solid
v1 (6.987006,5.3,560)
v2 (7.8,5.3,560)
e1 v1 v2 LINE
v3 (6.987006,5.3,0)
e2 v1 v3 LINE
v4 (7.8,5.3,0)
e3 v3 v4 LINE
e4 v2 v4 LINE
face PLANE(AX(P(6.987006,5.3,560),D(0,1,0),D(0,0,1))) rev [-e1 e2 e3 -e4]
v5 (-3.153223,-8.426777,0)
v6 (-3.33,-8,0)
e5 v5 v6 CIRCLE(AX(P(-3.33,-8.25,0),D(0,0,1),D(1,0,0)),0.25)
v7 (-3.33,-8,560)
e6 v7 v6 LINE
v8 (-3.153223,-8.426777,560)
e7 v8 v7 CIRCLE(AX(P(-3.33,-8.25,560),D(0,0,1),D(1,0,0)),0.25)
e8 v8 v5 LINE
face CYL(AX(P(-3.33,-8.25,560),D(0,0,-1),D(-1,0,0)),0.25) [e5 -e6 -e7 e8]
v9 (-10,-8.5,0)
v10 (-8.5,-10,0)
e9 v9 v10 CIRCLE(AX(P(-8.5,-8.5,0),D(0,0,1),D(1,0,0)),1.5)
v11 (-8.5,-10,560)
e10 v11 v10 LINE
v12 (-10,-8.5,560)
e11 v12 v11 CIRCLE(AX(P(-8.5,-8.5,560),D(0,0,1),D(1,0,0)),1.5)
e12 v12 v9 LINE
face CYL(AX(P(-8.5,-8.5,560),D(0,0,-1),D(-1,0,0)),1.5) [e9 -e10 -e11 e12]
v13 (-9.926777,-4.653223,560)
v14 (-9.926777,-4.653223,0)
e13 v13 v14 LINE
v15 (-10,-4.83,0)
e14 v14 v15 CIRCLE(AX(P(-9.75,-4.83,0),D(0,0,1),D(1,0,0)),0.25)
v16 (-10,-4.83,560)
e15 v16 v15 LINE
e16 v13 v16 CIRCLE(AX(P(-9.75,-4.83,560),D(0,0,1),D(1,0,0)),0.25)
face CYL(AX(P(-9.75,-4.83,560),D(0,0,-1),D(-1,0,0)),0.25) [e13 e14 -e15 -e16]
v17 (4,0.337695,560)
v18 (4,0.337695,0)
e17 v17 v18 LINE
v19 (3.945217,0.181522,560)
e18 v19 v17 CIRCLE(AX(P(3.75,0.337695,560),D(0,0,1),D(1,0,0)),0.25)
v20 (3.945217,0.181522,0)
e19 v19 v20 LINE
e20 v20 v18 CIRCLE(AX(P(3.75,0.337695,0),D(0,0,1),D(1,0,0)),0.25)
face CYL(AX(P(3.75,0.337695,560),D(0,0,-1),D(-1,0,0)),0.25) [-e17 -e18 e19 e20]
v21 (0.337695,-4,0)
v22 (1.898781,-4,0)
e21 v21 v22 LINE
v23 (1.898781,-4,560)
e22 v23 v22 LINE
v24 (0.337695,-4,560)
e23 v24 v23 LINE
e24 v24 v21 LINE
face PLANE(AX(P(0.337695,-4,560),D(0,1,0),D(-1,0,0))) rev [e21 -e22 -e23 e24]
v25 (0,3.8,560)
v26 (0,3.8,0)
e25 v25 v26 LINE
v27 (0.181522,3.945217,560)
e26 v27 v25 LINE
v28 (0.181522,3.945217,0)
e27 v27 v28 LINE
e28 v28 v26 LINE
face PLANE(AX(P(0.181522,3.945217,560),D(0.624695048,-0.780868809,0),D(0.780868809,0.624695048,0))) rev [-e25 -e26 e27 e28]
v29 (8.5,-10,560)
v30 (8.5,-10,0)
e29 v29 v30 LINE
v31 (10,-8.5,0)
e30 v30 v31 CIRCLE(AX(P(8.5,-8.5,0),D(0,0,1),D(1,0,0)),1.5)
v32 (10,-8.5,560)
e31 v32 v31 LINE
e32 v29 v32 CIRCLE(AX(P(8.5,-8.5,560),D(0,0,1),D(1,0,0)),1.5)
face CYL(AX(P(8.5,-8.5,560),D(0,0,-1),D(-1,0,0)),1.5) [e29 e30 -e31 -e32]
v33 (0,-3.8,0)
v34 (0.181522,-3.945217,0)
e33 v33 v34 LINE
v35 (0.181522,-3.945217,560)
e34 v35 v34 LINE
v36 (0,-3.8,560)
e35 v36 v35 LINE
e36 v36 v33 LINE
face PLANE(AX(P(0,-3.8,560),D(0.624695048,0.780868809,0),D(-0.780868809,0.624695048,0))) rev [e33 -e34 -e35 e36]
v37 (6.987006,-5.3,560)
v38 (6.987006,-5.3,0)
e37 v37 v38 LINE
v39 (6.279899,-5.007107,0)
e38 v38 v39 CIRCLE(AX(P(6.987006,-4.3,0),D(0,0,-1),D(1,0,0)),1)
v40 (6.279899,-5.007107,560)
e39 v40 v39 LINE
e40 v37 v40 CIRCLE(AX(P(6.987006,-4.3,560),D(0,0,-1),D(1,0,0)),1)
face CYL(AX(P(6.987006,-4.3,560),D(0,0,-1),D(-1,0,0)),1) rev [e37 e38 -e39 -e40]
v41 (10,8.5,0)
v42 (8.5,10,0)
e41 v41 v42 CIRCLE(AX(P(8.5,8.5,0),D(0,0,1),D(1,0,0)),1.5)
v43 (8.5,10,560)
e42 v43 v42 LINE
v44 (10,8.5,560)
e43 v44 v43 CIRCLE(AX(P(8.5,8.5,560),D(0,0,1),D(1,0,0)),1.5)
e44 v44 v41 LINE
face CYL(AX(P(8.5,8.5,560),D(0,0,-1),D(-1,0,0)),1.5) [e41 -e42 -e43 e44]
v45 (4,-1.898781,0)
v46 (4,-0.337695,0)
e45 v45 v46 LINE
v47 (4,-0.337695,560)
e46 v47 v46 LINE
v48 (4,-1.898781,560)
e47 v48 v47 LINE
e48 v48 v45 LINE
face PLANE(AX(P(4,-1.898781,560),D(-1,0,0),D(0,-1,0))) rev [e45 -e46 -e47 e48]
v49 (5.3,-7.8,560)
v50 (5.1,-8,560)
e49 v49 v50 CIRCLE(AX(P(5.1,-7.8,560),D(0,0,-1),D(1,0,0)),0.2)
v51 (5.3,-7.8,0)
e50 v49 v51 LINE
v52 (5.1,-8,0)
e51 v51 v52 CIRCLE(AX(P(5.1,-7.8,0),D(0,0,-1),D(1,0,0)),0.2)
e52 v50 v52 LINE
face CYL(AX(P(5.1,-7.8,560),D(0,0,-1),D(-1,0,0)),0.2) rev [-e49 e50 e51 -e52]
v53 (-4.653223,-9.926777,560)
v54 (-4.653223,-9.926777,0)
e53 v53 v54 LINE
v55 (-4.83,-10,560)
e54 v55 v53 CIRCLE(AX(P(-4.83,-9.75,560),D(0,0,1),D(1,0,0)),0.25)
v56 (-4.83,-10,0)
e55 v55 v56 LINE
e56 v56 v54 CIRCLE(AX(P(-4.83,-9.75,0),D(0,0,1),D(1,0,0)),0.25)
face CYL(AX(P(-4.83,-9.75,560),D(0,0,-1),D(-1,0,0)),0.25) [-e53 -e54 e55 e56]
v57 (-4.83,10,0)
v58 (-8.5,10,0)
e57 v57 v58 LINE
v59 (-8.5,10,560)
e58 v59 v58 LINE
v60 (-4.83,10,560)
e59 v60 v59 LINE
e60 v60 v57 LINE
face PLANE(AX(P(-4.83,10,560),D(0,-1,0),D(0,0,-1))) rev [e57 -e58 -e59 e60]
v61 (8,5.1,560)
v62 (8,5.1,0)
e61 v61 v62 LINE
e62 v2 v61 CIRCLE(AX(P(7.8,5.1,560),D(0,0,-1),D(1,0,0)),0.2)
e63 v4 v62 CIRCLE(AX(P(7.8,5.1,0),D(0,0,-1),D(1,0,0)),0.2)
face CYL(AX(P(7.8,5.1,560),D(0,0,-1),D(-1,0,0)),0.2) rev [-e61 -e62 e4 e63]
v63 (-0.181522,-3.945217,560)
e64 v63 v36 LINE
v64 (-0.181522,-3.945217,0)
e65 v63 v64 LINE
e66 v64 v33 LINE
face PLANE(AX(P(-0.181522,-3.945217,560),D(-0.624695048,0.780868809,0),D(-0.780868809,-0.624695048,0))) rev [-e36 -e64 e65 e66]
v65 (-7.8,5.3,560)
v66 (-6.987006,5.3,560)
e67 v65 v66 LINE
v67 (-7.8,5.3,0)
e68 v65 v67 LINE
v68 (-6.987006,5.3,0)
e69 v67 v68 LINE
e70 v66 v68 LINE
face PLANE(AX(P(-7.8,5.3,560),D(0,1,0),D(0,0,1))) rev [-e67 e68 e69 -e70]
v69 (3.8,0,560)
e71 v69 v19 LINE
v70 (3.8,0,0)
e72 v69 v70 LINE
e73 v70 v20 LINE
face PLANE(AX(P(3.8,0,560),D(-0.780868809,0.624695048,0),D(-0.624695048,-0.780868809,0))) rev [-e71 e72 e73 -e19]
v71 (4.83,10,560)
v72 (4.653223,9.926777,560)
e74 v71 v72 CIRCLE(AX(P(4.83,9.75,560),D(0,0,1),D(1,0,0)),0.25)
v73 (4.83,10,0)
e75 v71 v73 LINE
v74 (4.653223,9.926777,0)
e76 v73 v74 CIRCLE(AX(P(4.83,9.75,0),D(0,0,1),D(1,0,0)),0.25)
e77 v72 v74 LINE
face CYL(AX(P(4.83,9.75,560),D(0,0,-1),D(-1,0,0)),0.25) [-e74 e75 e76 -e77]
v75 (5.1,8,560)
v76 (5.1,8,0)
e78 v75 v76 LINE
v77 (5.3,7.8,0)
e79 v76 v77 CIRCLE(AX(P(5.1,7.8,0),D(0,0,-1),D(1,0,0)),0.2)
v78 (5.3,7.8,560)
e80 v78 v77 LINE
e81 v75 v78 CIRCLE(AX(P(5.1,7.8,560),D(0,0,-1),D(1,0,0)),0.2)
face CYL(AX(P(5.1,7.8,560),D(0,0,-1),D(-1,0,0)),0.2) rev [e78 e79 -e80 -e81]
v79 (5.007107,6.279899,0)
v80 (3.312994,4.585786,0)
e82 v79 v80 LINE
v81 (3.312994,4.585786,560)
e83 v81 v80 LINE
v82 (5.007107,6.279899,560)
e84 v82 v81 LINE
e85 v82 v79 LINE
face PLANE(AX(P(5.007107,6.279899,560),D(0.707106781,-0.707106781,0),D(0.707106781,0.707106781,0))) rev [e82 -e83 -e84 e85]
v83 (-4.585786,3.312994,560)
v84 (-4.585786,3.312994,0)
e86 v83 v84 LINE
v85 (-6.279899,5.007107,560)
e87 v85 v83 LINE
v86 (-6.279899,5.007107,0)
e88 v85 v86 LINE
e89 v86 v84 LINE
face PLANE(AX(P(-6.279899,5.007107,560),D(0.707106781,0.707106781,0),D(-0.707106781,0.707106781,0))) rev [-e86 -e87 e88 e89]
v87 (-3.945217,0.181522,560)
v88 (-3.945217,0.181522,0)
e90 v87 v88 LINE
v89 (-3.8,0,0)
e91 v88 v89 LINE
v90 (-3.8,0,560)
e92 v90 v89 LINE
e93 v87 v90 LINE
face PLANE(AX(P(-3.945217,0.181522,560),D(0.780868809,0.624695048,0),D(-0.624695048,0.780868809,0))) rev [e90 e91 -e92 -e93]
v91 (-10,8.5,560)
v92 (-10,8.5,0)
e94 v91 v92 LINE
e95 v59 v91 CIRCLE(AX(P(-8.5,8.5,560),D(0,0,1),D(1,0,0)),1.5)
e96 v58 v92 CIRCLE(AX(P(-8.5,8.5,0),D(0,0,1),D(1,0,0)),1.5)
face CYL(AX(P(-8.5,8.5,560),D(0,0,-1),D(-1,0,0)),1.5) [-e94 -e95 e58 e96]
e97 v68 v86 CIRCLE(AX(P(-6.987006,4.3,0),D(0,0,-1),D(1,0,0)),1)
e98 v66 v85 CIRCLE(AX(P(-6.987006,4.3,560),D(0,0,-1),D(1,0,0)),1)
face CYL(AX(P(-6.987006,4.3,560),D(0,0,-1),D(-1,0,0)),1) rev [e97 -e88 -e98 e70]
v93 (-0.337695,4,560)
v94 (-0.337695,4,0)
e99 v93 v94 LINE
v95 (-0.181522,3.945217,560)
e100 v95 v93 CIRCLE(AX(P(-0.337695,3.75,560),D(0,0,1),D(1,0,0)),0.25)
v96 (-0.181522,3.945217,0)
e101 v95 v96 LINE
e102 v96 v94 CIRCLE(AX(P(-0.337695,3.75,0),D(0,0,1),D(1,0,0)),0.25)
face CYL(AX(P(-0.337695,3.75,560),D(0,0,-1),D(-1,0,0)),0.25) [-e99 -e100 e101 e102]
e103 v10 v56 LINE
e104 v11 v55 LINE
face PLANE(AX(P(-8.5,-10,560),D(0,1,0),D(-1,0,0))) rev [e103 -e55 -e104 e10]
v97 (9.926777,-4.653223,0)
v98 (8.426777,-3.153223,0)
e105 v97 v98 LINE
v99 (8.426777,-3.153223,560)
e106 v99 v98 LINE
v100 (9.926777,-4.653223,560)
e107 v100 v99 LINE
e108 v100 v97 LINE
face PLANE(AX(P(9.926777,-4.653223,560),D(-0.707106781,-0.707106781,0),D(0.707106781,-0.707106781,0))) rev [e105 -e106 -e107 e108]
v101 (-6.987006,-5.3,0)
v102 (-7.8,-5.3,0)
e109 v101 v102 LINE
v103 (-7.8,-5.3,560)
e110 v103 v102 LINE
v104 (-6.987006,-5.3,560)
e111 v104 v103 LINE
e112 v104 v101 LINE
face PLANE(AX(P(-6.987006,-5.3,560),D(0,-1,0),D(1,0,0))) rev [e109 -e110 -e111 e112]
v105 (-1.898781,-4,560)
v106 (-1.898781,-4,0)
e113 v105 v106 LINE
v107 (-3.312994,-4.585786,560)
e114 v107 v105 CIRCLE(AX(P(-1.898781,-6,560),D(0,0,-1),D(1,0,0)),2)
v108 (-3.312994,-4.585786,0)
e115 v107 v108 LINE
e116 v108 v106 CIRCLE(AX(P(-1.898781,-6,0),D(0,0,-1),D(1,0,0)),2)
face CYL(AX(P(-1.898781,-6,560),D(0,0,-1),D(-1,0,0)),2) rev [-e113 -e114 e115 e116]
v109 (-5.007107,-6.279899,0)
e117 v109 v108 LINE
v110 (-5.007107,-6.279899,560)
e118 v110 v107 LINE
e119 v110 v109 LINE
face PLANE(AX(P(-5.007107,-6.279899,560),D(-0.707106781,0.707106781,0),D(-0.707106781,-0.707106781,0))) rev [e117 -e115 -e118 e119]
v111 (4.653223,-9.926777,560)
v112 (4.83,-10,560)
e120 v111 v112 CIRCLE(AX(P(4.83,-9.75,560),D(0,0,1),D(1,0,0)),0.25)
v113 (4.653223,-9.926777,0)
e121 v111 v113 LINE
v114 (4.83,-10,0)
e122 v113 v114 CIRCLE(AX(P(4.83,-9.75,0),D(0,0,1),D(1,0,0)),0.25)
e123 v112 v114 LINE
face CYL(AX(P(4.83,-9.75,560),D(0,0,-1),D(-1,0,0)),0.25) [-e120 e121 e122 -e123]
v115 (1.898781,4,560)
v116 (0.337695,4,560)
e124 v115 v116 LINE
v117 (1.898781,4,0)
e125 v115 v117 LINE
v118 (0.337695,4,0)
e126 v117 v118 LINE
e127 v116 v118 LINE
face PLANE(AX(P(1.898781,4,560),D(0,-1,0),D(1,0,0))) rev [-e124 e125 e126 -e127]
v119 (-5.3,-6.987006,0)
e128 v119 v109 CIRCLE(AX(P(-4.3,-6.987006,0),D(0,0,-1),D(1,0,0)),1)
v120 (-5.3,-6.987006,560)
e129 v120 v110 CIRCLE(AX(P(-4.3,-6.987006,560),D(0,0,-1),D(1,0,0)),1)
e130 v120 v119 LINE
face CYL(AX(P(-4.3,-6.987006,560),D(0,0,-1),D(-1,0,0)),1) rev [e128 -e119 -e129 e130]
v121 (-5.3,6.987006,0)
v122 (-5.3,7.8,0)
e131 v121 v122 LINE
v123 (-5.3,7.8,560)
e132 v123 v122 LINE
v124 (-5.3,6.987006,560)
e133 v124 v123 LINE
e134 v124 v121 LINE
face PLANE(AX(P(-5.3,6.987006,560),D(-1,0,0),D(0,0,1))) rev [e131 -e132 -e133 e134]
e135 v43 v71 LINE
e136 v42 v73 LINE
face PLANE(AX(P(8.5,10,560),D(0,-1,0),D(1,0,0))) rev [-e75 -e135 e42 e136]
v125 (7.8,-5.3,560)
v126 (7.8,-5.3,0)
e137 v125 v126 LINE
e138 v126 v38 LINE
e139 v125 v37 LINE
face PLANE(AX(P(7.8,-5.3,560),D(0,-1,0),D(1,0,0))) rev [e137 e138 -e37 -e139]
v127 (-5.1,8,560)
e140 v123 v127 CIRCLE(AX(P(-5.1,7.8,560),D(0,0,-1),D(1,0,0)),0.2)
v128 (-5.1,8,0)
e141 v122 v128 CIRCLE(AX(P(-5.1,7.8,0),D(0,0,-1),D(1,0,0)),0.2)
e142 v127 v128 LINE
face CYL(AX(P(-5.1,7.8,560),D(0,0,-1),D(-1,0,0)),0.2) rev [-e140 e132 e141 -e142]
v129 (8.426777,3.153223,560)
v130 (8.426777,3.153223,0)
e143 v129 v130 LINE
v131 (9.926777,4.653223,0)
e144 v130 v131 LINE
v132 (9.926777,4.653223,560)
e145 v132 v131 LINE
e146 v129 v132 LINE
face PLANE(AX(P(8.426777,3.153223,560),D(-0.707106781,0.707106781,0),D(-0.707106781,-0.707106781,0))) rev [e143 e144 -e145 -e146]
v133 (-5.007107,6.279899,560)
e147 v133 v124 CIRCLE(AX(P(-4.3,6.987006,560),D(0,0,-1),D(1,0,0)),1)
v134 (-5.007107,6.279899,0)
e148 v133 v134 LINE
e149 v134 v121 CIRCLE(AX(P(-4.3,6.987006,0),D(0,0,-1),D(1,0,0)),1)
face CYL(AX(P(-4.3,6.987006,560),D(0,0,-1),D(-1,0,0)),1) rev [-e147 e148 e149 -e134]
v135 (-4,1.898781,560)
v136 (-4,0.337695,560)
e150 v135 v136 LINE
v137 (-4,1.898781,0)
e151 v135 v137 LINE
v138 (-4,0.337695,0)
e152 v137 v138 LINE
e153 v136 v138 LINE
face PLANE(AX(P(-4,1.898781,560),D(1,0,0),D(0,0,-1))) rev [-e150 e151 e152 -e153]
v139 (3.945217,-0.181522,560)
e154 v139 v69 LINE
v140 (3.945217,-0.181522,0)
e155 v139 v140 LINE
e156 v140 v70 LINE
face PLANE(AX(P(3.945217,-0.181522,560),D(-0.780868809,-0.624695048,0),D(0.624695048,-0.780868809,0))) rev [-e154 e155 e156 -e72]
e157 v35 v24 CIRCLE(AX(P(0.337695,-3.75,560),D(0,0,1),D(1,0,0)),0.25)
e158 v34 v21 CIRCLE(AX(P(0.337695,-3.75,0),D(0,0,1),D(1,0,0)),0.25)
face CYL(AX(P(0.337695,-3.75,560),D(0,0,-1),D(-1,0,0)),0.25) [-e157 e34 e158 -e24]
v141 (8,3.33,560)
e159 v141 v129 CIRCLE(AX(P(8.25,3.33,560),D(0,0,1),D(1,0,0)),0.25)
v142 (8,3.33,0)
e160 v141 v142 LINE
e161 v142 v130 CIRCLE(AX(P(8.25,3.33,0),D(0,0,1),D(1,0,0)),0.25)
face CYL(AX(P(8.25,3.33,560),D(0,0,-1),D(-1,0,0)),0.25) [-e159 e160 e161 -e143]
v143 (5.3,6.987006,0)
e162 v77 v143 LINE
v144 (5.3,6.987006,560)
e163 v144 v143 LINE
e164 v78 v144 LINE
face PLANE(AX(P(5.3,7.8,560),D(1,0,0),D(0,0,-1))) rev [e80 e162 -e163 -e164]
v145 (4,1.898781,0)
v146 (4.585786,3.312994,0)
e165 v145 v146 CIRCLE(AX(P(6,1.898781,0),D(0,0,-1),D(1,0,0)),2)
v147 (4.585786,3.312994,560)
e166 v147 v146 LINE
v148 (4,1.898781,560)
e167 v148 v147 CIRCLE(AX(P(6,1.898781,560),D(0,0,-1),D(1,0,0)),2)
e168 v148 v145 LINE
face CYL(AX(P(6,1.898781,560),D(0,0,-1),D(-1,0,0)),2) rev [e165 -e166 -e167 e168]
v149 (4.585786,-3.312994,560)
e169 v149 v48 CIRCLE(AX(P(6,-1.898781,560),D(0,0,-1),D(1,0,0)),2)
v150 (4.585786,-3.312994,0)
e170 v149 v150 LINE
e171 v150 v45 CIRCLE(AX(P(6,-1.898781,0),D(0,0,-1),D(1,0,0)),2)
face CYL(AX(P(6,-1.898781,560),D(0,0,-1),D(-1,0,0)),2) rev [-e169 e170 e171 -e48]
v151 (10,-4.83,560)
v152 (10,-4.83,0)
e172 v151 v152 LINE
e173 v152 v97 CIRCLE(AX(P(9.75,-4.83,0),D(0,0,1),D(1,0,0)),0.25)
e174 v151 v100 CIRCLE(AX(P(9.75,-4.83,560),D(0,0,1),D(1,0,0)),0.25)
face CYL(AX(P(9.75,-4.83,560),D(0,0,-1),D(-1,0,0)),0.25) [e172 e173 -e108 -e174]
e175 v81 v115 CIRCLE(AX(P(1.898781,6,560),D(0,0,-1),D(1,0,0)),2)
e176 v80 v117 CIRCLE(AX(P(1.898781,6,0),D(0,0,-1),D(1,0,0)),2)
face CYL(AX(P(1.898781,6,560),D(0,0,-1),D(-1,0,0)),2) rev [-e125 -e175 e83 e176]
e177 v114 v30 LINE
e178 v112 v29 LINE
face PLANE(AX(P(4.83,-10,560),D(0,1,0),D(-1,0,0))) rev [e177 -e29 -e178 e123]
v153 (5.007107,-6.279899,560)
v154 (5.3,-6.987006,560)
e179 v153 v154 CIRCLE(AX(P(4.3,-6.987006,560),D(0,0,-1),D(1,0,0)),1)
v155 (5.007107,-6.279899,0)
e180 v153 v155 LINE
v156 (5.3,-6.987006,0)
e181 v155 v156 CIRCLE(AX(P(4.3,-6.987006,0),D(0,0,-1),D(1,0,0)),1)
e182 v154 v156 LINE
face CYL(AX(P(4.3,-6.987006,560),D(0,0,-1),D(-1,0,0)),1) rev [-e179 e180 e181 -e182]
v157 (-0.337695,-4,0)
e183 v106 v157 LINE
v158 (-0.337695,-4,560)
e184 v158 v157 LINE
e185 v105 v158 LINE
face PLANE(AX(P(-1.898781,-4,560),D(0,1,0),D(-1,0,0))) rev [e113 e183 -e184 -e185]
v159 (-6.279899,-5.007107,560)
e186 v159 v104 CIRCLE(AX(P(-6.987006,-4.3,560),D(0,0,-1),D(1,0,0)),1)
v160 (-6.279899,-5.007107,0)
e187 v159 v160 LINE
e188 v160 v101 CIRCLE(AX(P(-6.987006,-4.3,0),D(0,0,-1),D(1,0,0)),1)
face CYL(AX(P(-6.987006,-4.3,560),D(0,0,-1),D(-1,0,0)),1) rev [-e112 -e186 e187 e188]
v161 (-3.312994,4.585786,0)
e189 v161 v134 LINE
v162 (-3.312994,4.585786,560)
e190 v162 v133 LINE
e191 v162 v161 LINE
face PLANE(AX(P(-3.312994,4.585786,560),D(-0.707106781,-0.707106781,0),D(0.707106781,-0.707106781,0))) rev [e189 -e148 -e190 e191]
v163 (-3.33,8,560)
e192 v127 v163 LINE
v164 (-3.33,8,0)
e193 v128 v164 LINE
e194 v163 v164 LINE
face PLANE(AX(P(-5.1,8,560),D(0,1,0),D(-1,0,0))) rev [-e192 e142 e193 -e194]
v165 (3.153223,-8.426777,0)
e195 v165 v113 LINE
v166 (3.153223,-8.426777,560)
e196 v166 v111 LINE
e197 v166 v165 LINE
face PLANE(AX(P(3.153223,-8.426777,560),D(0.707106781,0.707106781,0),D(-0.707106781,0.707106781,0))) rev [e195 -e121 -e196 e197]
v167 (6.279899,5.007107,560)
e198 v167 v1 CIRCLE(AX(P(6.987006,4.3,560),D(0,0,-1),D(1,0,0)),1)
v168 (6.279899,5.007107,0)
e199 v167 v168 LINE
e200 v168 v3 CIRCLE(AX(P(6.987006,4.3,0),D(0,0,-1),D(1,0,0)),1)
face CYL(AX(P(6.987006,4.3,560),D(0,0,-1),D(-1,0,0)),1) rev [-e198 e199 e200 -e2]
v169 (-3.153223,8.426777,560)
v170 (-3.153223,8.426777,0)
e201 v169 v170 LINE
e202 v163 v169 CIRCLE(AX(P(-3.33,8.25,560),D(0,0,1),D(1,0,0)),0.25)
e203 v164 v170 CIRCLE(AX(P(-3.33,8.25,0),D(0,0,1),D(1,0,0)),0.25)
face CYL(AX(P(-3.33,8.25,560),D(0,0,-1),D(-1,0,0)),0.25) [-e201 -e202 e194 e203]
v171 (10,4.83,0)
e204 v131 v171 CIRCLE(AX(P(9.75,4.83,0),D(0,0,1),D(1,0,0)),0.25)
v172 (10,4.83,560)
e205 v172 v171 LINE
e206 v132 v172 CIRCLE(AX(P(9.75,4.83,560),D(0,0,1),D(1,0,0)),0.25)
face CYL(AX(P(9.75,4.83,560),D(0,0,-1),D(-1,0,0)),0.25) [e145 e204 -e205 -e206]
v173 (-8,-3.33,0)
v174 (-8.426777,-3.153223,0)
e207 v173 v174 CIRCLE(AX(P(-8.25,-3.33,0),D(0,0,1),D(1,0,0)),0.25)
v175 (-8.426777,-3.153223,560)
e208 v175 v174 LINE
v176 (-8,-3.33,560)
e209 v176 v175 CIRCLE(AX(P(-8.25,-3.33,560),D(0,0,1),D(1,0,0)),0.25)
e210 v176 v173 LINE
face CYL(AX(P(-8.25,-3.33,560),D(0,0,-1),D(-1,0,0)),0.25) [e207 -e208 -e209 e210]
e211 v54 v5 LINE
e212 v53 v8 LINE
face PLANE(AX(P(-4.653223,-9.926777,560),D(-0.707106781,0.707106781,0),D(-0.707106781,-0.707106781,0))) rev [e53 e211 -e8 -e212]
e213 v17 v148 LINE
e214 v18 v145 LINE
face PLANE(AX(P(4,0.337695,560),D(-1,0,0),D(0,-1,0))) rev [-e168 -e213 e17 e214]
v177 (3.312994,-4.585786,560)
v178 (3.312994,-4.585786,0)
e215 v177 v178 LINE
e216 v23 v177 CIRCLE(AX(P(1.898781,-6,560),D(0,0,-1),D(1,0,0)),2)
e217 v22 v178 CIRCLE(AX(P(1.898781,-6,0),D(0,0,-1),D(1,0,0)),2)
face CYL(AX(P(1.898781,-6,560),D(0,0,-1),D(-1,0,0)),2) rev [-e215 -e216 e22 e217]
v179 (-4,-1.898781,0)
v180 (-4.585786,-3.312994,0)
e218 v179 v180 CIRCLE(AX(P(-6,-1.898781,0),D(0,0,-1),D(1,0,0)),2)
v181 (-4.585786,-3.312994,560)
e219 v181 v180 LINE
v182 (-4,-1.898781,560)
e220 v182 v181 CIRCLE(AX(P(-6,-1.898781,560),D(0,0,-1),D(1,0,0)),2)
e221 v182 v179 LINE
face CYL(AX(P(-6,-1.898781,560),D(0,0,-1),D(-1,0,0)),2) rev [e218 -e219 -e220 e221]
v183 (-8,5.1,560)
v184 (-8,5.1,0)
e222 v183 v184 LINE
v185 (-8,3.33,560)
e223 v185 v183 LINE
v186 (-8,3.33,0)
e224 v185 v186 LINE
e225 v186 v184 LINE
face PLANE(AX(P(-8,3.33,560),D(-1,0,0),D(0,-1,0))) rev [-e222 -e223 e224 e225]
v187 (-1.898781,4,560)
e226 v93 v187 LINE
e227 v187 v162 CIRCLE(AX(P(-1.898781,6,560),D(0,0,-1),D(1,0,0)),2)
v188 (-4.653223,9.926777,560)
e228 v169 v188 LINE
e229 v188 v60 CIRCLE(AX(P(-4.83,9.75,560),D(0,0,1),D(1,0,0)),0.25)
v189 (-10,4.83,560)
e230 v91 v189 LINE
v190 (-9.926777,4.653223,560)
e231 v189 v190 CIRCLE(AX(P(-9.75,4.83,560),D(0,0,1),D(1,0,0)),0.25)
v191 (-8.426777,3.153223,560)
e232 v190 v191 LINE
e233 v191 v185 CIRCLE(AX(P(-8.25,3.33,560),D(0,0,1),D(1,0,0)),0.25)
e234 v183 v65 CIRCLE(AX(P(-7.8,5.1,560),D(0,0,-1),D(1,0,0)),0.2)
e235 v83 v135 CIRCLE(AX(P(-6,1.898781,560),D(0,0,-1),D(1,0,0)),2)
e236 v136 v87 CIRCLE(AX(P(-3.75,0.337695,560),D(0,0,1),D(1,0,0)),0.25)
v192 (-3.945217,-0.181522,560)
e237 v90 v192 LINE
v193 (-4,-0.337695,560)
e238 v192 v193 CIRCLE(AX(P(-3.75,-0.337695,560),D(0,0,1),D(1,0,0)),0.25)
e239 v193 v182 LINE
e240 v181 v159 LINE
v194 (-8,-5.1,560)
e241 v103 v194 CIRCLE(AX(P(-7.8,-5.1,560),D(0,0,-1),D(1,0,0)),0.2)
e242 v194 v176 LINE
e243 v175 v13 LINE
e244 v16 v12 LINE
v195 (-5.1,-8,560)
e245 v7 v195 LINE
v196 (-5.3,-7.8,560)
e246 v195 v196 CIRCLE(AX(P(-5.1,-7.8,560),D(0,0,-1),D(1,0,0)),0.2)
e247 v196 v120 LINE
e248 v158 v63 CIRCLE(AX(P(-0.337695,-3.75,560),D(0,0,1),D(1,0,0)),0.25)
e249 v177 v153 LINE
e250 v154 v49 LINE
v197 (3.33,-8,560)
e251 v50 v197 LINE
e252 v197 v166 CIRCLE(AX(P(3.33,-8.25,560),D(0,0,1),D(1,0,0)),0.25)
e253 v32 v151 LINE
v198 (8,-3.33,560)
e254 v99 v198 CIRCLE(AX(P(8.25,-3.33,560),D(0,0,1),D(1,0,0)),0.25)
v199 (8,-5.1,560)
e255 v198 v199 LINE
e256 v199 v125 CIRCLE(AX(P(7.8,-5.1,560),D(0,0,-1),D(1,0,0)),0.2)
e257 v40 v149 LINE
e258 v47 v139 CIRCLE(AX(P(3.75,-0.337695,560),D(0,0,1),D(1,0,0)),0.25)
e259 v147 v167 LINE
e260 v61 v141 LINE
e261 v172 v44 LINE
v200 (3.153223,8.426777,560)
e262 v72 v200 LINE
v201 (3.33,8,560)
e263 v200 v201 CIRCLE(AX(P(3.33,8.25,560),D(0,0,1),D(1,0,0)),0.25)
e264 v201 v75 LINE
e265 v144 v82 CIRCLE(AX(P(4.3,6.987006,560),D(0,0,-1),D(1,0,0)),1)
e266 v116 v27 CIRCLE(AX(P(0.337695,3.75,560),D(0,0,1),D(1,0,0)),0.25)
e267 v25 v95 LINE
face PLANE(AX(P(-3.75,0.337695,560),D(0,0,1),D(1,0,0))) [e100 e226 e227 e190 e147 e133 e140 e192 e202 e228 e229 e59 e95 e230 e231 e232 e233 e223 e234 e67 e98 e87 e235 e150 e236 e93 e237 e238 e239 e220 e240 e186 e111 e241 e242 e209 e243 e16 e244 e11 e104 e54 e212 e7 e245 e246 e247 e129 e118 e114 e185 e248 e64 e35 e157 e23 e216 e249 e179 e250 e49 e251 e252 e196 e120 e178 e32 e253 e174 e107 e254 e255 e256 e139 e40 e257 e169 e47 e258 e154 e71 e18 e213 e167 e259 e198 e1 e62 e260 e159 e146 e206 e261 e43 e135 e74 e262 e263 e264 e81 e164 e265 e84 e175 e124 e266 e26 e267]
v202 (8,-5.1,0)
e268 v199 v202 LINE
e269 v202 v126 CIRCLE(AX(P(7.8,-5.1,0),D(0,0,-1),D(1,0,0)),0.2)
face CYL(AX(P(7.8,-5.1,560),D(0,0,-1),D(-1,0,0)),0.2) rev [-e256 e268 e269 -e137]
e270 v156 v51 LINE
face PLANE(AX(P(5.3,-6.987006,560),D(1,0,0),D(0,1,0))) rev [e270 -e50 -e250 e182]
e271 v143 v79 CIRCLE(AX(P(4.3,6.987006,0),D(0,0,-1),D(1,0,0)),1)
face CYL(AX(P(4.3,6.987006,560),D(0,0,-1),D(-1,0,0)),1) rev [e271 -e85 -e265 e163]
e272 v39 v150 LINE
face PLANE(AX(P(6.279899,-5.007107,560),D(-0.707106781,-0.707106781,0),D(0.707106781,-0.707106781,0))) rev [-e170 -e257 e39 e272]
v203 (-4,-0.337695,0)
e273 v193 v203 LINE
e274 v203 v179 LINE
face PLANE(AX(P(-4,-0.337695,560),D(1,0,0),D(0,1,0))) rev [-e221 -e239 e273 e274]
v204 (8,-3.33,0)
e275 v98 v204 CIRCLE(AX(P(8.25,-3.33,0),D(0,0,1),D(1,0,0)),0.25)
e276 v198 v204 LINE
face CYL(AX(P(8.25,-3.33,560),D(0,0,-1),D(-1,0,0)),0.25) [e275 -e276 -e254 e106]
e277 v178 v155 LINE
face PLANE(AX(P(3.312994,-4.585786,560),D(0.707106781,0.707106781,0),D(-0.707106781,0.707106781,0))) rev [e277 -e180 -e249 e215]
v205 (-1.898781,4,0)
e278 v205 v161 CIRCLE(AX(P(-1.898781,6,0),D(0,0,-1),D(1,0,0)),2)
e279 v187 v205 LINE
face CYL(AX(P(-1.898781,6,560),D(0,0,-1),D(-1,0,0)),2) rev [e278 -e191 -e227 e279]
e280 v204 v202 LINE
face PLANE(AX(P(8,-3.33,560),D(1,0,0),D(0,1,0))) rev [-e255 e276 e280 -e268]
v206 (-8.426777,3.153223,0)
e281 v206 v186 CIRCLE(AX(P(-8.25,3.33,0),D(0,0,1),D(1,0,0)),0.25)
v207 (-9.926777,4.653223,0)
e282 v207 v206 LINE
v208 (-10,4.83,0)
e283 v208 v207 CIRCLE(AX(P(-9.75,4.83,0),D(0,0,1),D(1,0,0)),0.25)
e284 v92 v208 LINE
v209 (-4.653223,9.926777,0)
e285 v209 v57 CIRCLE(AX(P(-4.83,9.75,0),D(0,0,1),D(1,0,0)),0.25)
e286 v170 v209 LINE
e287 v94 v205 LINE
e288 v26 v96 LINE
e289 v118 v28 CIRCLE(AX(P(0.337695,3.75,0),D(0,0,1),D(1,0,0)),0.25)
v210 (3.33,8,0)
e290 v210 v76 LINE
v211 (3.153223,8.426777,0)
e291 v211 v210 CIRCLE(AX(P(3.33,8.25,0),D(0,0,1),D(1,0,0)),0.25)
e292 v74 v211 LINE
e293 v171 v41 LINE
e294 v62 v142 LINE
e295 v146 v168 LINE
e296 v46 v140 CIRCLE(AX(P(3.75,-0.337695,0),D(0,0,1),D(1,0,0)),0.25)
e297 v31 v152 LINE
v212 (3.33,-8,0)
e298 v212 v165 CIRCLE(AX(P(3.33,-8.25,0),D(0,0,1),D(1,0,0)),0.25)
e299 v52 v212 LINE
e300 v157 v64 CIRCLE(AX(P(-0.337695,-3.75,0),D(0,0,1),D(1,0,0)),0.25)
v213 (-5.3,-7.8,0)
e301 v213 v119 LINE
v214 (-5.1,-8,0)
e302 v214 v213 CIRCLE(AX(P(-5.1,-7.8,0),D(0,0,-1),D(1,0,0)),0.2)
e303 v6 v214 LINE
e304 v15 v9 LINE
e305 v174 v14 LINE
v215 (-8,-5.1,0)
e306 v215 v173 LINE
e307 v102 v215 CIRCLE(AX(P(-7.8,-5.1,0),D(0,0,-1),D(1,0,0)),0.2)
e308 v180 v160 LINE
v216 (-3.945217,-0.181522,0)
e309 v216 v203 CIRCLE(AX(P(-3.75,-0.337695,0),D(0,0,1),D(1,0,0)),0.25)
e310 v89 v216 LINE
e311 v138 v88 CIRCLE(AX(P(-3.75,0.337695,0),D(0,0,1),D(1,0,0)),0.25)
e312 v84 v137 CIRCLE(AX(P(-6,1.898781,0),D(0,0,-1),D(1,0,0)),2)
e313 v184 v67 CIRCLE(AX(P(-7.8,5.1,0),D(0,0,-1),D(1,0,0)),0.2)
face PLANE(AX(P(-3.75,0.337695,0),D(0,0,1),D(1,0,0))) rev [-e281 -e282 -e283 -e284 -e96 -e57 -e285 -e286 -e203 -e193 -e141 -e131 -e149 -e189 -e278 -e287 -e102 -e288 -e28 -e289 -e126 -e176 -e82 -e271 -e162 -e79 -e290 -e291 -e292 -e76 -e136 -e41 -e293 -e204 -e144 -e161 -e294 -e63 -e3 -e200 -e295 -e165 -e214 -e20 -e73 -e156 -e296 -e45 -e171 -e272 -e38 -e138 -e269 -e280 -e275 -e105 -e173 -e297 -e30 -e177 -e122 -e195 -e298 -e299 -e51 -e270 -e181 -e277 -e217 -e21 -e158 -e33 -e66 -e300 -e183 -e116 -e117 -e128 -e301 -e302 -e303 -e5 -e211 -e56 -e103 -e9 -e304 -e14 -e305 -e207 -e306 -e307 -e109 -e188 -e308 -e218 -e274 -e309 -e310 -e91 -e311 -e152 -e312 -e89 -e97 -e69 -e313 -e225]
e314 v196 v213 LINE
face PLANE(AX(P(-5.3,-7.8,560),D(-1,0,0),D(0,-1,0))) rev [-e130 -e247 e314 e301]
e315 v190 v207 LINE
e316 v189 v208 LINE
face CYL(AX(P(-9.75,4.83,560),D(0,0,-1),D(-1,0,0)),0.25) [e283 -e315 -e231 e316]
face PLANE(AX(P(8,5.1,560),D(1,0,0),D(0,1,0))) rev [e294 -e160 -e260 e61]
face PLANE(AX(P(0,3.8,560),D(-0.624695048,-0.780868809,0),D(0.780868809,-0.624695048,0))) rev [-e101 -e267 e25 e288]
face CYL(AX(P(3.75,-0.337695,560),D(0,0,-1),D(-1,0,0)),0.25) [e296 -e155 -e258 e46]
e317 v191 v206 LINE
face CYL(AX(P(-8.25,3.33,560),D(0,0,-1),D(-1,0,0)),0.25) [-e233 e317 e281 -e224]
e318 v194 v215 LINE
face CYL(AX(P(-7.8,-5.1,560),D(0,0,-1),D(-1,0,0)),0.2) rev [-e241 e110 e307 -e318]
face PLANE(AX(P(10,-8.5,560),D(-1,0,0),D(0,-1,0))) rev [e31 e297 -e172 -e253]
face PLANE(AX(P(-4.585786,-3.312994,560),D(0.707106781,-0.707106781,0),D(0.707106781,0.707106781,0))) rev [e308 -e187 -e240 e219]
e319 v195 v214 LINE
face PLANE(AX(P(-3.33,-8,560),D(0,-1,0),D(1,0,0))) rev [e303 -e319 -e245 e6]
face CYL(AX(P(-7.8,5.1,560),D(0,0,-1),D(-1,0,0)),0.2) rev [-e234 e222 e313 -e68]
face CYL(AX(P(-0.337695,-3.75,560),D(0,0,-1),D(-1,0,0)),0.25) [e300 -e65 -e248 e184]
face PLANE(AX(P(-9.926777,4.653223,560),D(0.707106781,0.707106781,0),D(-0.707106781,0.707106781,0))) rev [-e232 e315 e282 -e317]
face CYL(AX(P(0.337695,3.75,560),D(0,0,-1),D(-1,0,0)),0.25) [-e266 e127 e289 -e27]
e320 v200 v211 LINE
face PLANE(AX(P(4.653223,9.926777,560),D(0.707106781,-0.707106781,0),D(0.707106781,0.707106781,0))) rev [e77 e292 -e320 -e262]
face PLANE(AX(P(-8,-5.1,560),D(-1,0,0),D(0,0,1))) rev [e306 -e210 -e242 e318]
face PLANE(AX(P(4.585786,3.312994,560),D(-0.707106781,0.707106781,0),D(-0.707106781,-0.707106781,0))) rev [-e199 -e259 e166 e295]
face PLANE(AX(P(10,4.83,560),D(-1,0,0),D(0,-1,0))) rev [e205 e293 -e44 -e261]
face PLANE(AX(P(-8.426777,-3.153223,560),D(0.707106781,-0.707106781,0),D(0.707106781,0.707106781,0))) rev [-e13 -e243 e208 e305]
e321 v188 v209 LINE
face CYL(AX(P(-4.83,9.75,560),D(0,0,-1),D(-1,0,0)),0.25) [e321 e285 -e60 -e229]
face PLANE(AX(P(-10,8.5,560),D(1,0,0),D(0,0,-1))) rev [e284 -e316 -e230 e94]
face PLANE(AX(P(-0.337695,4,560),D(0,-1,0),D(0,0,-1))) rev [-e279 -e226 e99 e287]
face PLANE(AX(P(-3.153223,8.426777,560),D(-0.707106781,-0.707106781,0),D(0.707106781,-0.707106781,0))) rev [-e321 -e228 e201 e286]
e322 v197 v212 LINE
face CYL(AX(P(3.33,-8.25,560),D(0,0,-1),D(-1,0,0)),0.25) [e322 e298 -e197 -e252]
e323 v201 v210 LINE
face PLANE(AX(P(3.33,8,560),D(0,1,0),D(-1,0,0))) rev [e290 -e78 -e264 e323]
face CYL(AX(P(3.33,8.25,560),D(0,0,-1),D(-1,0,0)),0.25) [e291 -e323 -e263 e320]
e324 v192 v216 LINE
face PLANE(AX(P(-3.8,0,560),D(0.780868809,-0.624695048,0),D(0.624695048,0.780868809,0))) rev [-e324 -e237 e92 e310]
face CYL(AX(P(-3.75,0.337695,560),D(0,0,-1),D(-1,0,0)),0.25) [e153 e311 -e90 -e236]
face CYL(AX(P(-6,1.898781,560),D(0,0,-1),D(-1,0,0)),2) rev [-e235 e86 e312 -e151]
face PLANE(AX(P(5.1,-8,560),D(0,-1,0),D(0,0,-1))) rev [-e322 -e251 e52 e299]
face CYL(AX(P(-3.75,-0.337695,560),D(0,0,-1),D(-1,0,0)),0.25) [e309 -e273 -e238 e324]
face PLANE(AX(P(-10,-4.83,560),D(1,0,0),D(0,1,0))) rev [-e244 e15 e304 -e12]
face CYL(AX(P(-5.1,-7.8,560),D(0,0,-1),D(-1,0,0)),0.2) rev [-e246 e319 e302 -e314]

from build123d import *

# Parameters (mm, degrees)
EXTRUDE_1_DEPTH = 560


# Read off the part's stored shape, not the designer's step: 222 Конструкционный профиль 20х20-1-surface1
with BuildPart() as part:
    # Эскиз1 → Бобышка-Вытянуть1 (new body)
    with BuildSketch(Plane.XY):
        with BuildLine():
            Line((-3.945217202, 0.181521503), (-3.8, 0))
            Line((-3.8, 0), (-3.945217202, -0.181521503))
            ThreePointArc((-3.945217202, -0.181521503), (-3.98590708, -0.254943529), (-4, -0.337695265))
            Line((-4, -0.337695265), (-4, -1.898780669))
            ThreePointArc((-4, -1.898780669), (-4.152240935, -2.664147534), (-4.585786438, -3.312994231))
            Line((-4.585786438, -3.312994231), (-6.279898987, -5.007106781))
            ThreePointArc((-6.279898987, -5.007106781), (-6.604322336, -5.223879533), (-6.987005769, -5.3))
            Line((-6.987005769, -5.3), (-7.8, -5.3))
            ThreePointArc((-7.8, -5.3), (-7.941421356, -5.241421356), (-8, -5.1))
            Line((-8, -5.1), (-8, -3.33))
            ThreePointArc((-8, -3.33), (-8.154329142, -3.099030117), (-8.426776695, -3.153223305))
            Line((-8.426776695, -3.153223305), (-9.926776695, -4.653223305))
            ThreePointArc((-9.926776695, -4.653223305), (-9.980969883, -4.734329142), (-10, -4.83))
            Line((-10, -4.83), (-10, -8.5))
            ThreePointArc((-10, -8.5), (-9.560660172, -9.560660172), (-8.5, -10))
            Line((-8.5, -10), (-4.83, -10))
            ThreePointArc((-4.83, -10), (-4.734329142, -9.980969883), (-4.653223305, -9.926776695))
            Line((-4.653223305, -9.926776695), (-3.153223305, -8.426776695))
            ThreePointArc((-3.153223305, -8.426776695), (-3.099030117, -8.154329142), (-3.33, -8))
            Line((-3.33, -8), (-5.1, -8))
            ThreePointArc((-5.1, -8), (-5.241421356, -7.941421356), (-5.3, -7.8))
            Line((-5.3, -7.8), (-5.3, -6.987005769))
            ThreePointArc((-5.3, -6.987005769), (-5.223879533, -6.604322336), (-5.007106781, -6.279898987))
            Line((-5.007106781, -6.279898987), (-3.312994231, -4.585786438))
            ThreePointArc((-3.312994231, -4.585786438), (-2.664147534, -4.152240935), (-1.898780669, -4))
            Line((-1.898780669, -4), (-0.337695265, -4))
            ThreePointArc((-0.337695265, -4), (-0.254943529, -3.98590708), (-0.181521503, -3.945217202))
            Line((-0.181521503, -3.945217202), (0, -3.8))
            Line((0, -3.8), (0.181521503, -3.945217202))
            ThreePointArc((0.181521503, -3.945217202), (0.254943529, -3.98590708), (0.337695265, -4))
            Line((0.337695265, -4), (1.898780669, -4))
            ThreePointArc((1.898780669, -4), (2.664147534, -4.152240935), (3.312994231, -4.585786438))
            Line((3.312994231, -4.585786438), (5.007106781, -6.279898987))
            ThreePointArc((5.007106781, -6.279898987), (5.223879533, -6.604322336), (5.3, -6.987005769))
            Line((5.3, -6.987005769), (5.3, -7.8))
            ThreePointArc((5.3, -7.8), (5.241421356, -7.941421356), (5.1, -8))
            Line((5.1, -8), (3.33, -8))
            ThreePointArc((3.33, -8), (3.099030117, -8.154329142), (3.153223305, -8.426776695))
            Line((3.153223305, -8.426776695), (4.653223305, -9.926776695))
            ThreePointArc((4.653223305, -9.926776695), (4.734329142, -9.980969883), (4.83, -10))
            Line((4.83, -10), (8.5, -10))
            ThreePointArc((8.5, -10), (9.560660172, -9.560660172), (10, -8.5))
            Line((10, -8.5), (10, -4.83))
            ThreePointArc((10, -4.83), (9.980969883, -4.734329142), (9.926776695, -4.653223305))
            Line((9.926776695, -4.653223305), (8.426776695, -3.153223305))
            ThreePointArc((8.426776695, -3.153223305), (8.154329142, -3.099030117), (8, -3.33))
            Line((8, -3.33), (8, -5.1))
            ThreePointArc((8, -5.1), (7.941421356, -5.241421356), (7.8, -5.3))
            Line((7.8, -5.3), (6.987005769, -5.3))
            ThreePointArc((6.987005769, -5.3), (6.604322336, -5.223879533), (6.279898987, -5.007106781))
            Line((6.279898987, -5.007106781), (4.585786438, -3.312994231))
            ThreePointArc((4.585786438, -3.312994231), (4.152240935, -2.664147534), (4, -1.898780669))
            Line((4, -1.898780669), (4, -0.337695265))
            ThreePointArc((4, -0.337695265), (3.98590708, -0.254943529), (3.945217202, -0.181521503))
            Line((3.945217202, -0.181521503), (3.8, 0))
            Line((3.8, 0), (3.945217202, 0.181521503))
            ThreePointArc((3.945217202, 0.181521503), (3.98590708, 0.254943529), (4, 0.337695265))
            Line((4, 0.337695265), (4, 1.898780669))
            ThreePointArc((4, 1.898780669), (4.152240935, 2.664147534), (4.585786438, 3.312994231))
            Line((4.585786438, 3.312994231), (6.279898987, 5.007106781))
            ThreePointArc((6.279898987, 5.007106781), (6.604322336, 5.223879533), (6.987005769, 5.3))
            Line((6.987005769, 5.3), (7.8, 5.3))
            ThreePointArc((7.8, 5.3), (7.941421356, 5.241421356), (8, 5.1))
            Line((8, 5.1), (8, 3.33))
            ThreePointArc((8, 3.33), (8.154329142, 3.099030117), (8.426776695, 3.153223305))
            Line((8.426776695, 3.153223305), (9.926776695, 4.653223305))
            ThreePointArc((9.926776695, 4.653223305), (9.980969883, 4.734329142), (10, 4.83))
            Line((10, 4.83), (10, 8.5))
            ThreePointArc((10, 8.5), (9.560660172, 9.560660172), (8.5, 10))
            Line((8.5, 10), (4.83, 10))
            ThreePointArc((4.83, 10), (4.734329142, 9.980969883), (4.653223305, 9.926776695))
            Line((4.653223305, 9.926776695), (3.153223305, 8.426776695))
            ThreePointArc((3.153223305, 8.426776695), (3.099030117, 8.154329142), (3.33, 8))
            Line((3.33, 8), (5.1, 8))
            ThreePointArc((5.1, 8), (5.241421356, 7.941421356), (5.3, 7.8))
            Line((5.3, 7.8), (5.3, 6.987005769))
            ThreePointArc((5.3, 6.987005769), (5.223879533, 6.604322336), (5.007106781, 6.279898987))
            Line((5.007106781, 6.279898987), (3.312994231, 4.585786438))
            ThreePointArc((3.312994231, 4.585786438), (2.664147534, 4.152240935), (1.898780669, 4))
            Line((1.898780669, 4), (0.337695265, 4))
            ThreePointArc((0.337695265, 4), (0.254943529, 3.98590708), (0.181521503, 3.945217202))
            Line((0.181521503, 3.945217202), (0, 3.8))
            Line((0, 3.8), (-0.181521503, 3.945217202))
            ThreePointArc((-0.181521503, 3.945217202), (-0.254943529, 3.98590708), (-0.337695265, 4))
            Line((-0.337695265, 4), (-1.898780669, 4))
            ThreePointArc((-1.898780669, 4), (-2.664147534, 4.152240935), (-3.312994231, 4.585786438))
            Line((-3.312994231, 4.585786438), (-5.007106781, 6.279898987))
            ThreePointArc((-5.007106781, 6.279898987), (-5.223879533, 6.604322336), (-5.3, 6.987005769))
            Line((-5.3, 6.987005769), (-5.3, 7.8))
            ThreePointArc((-5.3, 7.8), (-5.241421356, 7.941421356), (-5.1, 8))
            Line((-5.1, 8), (-3.33, 8))
            ThreePointArc((-3.33, 8), (-3.099030117, 8.154329142), (-3.153223305, 8.426776695))
            Line((-3.153223305, 8.426776695), (-4.653223305, 9.926776695))
            ThreePointArc((-4.653223305, 9.926776695), (-4.734329142, 9.980969883), (-4.83, 10))
            Line((-4.83, 10), (-8.5, 10))
            ThreePointArc((-8.5, 10), (-9.560660172, 9.560660172), (-10, 8.5))
            Line((-10, 8.5), (-10, 4.83))
            ThreePointArc((-10, 4.83), (-9.980969883, 4.734329142), (-9.926776695, 4.653223305))
            Line((-9.926776695, 4.653223305), (-8.426776695, 3.153223305))
            ThreePointArc((-8.426776695, 3.153223305), (-8.154329142, 3.099030117), (-8, 3.33))
            Line((-8, 3.33), (-8, 5.1))
            ThreePointArc((-8, 5.1), (-7.941421356, 5.241421356), (-7.8, 5.3))
            Line((-7.8, 5.3), (-6.987005769, 5.3))
            ThreePointArc((-6.987005769, 5.3), (-6.604322336, 5.223879533), (-6.279898987, 5.007106781))
            Line((-6.279898987, 5.007106781), (-4.585786438, 3.312994231))
            ThreePointArc((-4.585786438, 3.312994231), (-4.152240935, 2.664147534), (-4, 1.898780669))
            Line((-4, 1.898780669), (-4, 0.337695265))
            ThreePointArc((-4, 0.337695265), (-3.98590708, 0.254943529), (-3.945217202, 0.181521503))
        make_face()
    extrude(amount=EXTRUDE_1_DEPTH)


solid = part.part
